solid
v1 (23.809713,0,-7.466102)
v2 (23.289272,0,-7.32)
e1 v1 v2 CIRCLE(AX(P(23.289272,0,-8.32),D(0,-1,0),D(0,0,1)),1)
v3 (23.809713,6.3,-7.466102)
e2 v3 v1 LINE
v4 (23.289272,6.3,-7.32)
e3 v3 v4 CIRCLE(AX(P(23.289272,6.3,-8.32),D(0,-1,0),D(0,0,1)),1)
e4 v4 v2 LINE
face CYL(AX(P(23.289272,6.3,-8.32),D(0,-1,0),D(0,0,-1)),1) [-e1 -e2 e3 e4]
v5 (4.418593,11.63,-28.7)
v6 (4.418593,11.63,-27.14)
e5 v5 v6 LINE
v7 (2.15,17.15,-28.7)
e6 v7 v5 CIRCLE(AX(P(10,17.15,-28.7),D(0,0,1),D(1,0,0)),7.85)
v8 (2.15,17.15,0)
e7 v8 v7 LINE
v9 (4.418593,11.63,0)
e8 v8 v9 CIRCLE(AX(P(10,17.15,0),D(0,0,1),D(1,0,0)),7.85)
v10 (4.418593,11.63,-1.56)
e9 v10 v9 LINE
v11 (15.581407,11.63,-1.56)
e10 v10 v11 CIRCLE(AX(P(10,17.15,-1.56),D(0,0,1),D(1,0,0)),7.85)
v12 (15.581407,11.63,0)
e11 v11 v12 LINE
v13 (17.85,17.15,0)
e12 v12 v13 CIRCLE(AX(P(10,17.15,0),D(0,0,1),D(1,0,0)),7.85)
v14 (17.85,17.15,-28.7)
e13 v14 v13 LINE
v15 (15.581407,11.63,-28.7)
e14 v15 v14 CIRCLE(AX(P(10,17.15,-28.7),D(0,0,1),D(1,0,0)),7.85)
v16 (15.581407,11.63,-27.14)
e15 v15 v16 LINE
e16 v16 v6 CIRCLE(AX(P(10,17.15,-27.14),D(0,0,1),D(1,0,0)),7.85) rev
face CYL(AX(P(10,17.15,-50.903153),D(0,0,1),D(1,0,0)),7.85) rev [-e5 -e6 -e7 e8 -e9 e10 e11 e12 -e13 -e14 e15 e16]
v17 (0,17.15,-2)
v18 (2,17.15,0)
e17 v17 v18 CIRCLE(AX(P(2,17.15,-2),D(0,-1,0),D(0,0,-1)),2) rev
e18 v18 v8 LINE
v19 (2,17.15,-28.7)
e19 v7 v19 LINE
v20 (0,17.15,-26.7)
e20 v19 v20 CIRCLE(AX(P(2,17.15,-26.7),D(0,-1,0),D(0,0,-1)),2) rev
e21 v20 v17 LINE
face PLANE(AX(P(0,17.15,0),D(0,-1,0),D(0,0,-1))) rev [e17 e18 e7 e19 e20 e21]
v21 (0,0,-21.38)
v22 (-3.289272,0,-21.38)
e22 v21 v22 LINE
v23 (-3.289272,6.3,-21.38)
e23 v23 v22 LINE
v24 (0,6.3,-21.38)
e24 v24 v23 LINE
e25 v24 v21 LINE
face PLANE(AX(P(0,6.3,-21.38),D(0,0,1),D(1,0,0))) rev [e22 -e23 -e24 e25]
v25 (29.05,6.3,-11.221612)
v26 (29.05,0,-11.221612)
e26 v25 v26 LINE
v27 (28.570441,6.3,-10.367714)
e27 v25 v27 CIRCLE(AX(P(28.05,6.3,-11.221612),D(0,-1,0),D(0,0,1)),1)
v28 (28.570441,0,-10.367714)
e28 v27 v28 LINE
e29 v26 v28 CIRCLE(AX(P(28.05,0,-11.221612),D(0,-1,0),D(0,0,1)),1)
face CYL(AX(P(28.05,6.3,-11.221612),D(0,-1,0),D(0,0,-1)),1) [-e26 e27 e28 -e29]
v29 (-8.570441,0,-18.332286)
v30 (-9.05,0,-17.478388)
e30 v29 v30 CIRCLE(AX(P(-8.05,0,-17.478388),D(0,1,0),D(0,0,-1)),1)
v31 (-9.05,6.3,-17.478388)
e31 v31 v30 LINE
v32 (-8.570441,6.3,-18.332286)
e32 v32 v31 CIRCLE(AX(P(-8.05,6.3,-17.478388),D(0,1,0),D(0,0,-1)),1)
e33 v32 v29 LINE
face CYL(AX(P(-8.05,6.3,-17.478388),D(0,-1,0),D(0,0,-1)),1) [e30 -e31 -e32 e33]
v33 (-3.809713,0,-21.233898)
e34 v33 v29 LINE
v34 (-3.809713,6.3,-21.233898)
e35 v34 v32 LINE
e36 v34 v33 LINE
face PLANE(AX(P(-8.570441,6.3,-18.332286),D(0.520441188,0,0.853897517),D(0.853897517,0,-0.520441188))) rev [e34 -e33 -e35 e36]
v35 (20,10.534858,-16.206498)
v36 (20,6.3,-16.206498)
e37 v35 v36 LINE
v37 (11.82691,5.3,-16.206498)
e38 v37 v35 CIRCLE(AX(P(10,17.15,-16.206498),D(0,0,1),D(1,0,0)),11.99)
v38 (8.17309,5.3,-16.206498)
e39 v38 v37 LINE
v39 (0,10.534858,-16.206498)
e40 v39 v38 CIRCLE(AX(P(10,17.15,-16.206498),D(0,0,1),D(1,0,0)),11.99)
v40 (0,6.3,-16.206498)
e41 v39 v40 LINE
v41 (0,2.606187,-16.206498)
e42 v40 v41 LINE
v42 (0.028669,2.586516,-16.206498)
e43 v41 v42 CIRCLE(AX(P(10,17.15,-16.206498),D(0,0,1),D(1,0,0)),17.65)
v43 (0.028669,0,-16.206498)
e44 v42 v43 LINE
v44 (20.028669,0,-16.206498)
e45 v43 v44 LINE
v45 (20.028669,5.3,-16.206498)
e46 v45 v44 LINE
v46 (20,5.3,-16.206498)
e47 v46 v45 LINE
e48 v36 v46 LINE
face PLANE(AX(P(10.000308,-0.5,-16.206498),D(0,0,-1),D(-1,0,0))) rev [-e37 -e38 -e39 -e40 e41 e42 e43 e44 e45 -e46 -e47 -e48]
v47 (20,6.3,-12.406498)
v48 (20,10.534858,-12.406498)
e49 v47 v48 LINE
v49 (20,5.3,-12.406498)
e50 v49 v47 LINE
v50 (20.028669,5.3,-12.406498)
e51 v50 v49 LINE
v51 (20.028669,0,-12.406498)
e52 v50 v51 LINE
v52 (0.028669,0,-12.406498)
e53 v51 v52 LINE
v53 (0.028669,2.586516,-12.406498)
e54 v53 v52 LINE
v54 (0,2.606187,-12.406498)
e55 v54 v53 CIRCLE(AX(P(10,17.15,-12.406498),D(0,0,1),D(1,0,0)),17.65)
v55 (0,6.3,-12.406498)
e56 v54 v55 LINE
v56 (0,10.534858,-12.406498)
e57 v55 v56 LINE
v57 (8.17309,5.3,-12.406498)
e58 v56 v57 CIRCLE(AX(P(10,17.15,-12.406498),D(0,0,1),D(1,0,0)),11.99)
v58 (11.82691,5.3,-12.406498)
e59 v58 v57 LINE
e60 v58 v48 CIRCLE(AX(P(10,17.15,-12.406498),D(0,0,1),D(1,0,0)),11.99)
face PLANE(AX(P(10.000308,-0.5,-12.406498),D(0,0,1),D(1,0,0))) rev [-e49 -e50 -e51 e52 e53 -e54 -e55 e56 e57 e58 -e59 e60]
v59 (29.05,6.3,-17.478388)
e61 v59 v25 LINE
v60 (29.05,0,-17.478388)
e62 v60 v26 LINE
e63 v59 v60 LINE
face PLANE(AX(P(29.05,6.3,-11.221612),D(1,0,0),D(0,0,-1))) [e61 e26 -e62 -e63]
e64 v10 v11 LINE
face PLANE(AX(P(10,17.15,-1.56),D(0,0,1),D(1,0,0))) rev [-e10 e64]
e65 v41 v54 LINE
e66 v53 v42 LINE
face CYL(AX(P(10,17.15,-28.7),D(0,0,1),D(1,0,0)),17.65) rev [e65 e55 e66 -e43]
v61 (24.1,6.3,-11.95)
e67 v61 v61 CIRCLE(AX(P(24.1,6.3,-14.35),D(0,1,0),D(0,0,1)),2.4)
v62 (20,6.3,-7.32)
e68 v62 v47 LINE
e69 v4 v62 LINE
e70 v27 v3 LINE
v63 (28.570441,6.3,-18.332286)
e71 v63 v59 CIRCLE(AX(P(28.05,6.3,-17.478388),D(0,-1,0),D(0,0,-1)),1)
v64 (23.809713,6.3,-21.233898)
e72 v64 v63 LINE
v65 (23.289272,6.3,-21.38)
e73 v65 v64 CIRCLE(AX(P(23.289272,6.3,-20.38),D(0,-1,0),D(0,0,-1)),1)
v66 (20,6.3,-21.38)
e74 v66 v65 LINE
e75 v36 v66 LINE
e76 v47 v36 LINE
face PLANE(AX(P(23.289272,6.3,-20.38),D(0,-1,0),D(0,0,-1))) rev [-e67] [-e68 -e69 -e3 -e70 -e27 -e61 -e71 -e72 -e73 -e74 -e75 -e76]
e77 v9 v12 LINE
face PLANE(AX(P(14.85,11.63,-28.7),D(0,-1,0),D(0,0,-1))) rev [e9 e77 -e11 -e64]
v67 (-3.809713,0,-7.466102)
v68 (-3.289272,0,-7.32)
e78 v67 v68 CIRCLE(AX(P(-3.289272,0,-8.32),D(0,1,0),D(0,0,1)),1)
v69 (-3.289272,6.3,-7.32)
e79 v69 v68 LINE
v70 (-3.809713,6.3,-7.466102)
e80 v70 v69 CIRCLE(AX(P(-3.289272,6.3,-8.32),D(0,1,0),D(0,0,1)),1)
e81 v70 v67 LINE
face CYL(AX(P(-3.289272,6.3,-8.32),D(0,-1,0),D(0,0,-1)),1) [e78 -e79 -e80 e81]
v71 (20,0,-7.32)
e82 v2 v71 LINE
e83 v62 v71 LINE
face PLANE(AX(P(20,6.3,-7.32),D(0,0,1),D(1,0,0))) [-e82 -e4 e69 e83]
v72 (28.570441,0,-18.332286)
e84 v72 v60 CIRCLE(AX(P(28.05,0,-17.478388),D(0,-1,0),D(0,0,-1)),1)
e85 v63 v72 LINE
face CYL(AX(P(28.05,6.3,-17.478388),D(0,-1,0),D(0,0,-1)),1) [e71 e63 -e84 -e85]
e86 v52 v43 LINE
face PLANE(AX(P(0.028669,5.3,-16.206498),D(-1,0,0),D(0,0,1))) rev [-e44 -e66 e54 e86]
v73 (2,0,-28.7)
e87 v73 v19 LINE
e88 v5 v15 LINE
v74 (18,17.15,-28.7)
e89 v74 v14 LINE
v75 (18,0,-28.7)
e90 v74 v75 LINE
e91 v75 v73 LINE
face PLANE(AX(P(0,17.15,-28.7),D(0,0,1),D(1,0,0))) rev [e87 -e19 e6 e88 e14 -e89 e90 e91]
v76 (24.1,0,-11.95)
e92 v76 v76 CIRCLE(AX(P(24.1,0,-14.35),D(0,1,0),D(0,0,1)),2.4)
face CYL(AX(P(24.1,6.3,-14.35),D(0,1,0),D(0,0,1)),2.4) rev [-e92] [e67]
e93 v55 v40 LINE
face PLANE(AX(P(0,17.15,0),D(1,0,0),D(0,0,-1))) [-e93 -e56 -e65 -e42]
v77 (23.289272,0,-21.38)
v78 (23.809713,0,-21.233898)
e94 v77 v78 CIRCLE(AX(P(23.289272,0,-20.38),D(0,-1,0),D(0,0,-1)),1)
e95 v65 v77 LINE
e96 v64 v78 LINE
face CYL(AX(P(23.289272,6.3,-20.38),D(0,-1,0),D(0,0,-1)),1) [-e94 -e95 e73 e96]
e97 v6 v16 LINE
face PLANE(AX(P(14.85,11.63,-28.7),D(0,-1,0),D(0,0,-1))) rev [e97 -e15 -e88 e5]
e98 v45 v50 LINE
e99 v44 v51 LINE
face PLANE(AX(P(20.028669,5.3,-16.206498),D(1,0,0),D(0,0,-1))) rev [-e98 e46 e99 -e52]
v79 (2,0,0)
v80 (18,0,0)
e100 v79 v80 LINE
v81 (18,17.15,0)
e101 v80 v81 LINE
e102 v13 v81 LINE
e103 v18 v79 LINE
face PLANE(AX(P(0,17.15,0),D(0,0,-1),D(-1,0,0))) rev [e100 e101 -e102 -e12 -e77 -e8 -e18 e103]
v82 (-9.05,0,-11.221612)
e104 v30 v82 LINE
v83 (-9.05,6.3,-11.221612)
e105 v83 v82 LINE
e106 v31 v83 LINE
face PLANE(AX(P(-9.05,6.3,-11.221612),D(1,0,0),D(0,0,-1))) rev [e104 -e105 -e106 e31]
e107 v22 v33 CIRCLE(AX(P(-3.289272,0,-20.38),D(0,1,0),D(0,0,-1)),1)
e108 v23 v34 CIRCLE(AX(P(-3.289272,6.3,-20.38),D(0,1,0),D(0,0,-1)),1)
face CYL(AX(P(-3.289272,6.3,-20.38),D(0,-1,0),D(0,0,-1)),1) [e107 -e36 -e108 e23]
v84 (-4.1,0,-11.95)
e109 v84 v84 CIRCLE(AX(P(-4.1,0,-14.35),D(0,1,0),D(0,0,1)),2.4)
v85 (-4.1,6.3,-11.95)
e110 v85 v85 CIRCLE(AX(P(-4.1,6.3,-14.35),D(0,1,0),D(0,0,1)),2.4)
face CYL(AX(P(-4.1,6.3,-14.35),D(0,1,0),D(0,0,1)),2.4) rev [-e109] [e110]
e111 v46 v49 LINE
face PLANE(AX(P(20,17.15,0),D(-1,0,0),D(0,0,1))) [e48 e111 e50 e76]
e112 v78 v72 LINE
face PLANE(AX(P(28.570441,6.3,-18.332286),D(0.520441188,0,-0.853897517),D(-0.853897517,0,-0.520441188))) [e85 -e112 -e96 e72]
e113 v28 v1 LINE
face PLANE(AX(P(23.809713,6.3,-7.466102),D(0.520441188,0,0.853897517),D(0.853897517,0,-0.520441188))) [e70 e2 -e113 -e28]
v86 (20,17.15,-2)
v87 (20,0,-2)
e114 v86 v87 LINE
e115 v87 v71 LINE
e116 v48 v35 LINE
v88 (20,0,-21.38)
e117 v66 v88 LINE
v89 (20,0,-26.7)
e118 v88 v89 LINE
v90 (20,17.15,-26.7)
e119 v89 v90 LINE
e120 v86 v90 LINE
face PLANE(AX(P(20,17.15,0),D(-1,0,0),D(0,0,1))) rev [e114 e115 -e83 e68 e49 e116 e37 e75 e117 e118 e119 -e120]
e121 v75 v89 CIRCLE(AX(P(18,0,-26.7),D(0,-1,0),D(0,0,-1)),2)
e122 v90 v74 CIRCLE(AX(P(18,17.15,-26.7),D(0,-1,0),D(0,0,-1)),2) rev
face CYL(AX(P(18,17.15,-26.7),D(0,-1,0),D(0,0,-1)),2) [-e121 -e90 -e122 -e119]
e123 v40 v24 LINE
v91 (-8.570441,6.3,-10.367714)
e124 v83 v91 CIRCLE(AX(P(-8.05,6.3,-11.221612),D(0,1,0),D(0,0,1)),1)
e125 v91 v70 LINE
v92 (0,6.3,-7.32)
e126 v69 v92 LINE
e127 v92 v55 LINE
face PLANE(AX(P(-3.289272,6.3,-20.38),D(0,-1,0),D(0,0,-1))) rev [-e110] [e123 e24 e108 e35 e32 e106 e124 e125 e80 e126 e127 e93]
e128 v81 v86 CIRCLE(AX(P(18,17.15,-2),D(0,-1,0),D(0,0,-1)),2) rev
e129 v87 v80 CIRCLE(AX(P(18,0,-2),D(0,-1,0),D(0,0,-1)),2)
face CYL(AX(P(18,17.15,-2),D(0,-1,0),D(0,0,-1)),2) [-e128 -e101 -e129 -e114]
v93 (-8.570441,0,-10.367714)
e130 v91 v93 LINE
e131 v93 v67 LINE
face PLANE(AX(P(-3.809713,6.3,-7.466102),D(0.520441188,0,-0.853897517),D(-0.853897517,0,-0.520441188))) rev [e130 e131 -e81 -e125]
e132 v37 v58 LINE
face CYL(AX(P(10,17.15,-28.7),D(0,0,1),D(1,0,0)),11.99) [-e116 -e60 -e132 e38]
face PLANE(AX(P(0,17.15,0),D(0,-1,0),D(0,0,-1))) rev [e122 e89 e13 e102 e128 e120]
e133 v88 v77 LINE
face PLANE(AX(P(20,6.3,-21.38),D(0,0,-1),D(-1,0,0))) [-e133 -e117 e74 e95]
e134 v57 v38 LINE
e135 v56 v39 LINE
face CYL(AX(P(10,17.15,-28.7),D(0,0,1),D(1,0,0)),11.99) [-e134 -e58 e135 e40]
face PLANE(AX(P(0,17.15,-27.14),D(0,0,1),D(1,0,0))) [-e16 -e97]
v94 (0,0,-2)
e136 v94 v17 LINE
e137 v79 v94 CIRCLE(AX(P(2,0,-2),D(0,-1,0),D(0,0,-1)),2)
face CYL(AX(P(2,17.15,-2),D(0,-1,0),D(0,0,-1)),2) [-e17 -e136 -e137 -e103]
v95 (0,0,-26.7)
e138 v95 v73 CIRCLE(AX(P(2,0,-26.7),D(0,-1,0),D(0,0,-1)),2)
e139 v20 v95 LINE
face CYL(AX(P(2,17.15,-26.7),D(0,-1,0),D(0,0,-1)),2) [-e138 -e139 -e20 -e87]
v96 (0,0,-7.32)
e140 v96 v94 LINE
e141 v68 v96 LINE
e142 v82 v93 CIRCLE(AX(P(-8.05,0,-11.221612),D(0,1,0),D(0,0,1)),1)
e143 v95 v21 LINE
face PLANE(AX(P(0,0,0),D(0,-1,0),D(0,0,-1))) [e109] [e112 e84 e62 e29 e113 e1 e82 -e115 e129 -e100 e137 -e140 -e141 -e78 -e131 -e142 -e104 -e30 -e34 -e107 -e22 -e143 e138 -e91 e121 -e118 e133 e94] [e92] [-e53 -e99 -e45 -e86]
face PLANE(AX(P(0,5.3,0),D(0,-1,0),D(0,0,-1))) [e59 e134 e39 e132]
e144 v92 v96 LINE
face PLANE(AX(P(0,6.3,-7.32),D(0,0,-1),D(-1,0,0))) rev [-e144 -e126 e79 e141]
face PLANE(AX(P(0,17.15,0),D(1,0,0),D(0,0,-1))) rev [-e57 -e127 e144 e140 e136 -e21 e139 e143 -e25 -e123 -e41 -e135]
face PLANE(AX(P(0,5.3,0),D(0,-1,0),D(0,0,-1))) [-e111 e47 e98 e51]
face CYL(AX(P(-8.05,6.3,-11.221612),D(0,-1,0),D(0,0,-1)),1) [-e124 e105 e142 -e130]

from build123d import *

# Parameters (mm, degrees)
SKETCH1_W            = 20
SKETCH1_H            = 28.7
BOSS_EXTRUDE1_DEPTH  = 17.15
CUT_EXTRUDE1_START   = -1.56
SKETCH2_R            = 7.85
CUT_EXTRUDE1_DEPTH   = 25.58
CUT_EXTRUDE2_DEPTH   = 39.959113
BOSS_EXTRUDE2_DEPTH  = 6.3
M4_CLEARANCE_HOLE1_D = 4.8
CUT_REVOLVE3_START   = -16.206498
CUT_REVOLVE3_DEPTH   = 3.8
CUT_REVOLVE4_START   = -16.206498
CUT_REVOLVE4_DEPTH   = 3.8
SKETCH10_W           = 20
SKETCH10_H           = 3.8
CUT_EXTRUDE3_DEPTH   = 5.3
FILLET1_R            = 2


# Read off the part's stored shape, not the designer's step: Cut-Revolve3, Cut-Revolve4
with BuildPart() as part:
    # Sketch1 → Boss-Extrude1 (new body)
    with BuildSketch(Plane(origin=(0, 0, 0), x_dir=(1, 0, 0), z_dir=(0, 1, 0))):
        with Locations((10, 14.35)):
            Rectangle(SKETCH1_W, SKETCH1_H)
    extrude(amount=BOSS_EXTRUDE1_DEPTH)

    # Sketch2 → Cut-Extrude1 (cut)
    with BuildSketch(Plane.XY.offset(CUT_EXTRUDE1_START)):
        with Locations((10, 17.15)):
            Circle(SKETCH2_R)
    extrude(amount=-CUT_EXTRUDE1_DEPTH, mode=Mode.SUBTRACT)

    # Sketch3 → Cut-Extrude2 (cut, through all)
    with BuildSketch(Plane.XY):
        with BuildLine():
            Line((2.15, 17.15), (17.85, 17.15))
            ThreePointArc((17.85, 17.15), (17.260735, 14.166005), (15.581407, 11.63))
            Line((15.581407, 11.63), (14.85, 11.63))
            Line((14.85, 11.63), (5.15, 11.63))
            Line((5.15, 11.63), (4.418593, 11.63))
            ThreePointArc((4.418593, 11.63), (2.739265, 14.166005), (2.15, 17.15))
        make_face()
    extrude(amount=-CUT_EXTRUDE2_DEPTH, mode=Mode.SUBTRACT)

    # Sketch4 → Boss-Extrude2 (add)
    with BuildSketch(Plane.XZ):
        with BuildLine():
            Line((20, -7.32), (23.289272, -7.32))
            ThreePointArc((23.289272, -7.32), (23.559552, -7.357218), (23.809713, -7.466102))
            Line((23.809713, -7.466102), (28.570441, -10.367714))
            ThreePointArc((28.570441, -10.367714), (28.921906, -10.731939), (29.05, -11.221612))
            Line((29.05, -11.221612), (29.05, -17.478388))
            ThreePointArc((29.05, -17.478388), (28.921906, -17.968061), (28.570441, -18.332286))
            Line((28.570441, -18.332286), (23.809713, -21.233898))
            ThreePointArc((23.809713, -21.233898), (23.559552, -21.342782), (23.289272, -21.38))
            Line((23.289272, -21.38), (20, -21.38))
            Line((20, -21.38), (20, -7.32))
        make_face()
    boss_extrude2 = extrude(amount=-BOSS_EXTRUDE2_DEPTH)

    # Mirror1: Boss-Extrude2 across plane
    add(boss_extrude2.mirror(Plane(origin=(10, 0, 0), x_dir=(0, 0, 1), z_dir=(1, 0, 0))))

    # M4 Clearance Hole1 (through all)
    with Locations(Plane(origin=(0, 6.3, 0), x_dir=(1, 0, 0), z_dir=(0, 1, 0))):
        with Locations((24.1, 14.35), (-4.1, 14.35)):
            Hole(M4_CLEARANCE_HOLE1_D / 2)

    # Cut-Revolve3 outline → Cut-Revolve3 (cut)
    with BuildSketch(Plane.XY.offset(CUT_REVOLVE3_START)):
        with BuildLine():
            Line((0, 10.534858), (0, 2.606187))
            ThreePointArc((0, 2.606187), (2.795508, 1.037341), (5.828669, 0))
            Line((5.828669, 0), (10, 0))
            Line((10, 0), (10, 5.16))
            ThreePointArc((10, 5.16), (4.323533, 6.588853), (0, 10.534858))
        make_face()
    extrude(amount=CUT_REVOLVE3_DEPTH, mode=Mode.SUBTRACT)

    # Cut-Revolve4 outline → Cut-Revolve4 (cut)
    with BuildSketch(Plane.XY.offset(CUT_REVOLVE4_START)):
        with BuildLine():
            ThreePointArc((20, 10.534858), (15.676467, 6.588853), (10, 5.16))
            Line((10, 5.16), (10, 0))
            Line((10, 0), (14.171331, 0))
            ThreePointArc((14.171331, 0), (17.204492, 1.037341), (20, 2.606187))
            Line((20, 2.606187), (20, 10.534858))
        make_face()
    extrude(amount=CUT_REVOLVE4_DEPTH, mode=Mode.SUBTRACT)

    # Sketch10 → Cut-Extrude3 (cut)
    with BuildSketch(Plane.XZ):
        with Locations((10.028669, -14.306498)):
            Rectangle(SKETCH10_W, SKETCH10_H)
    extrude(amount=-CUT_EXTRUDE3_DEPTH, mode=Mode.SUBTRACT)

    # Fillet1
    fillet1_edges = [part.edges().sort_by_distance(p)[0] for p in [
        (0, 8.575, -28.7),
        (20, 8.575, -28.7),
        (20, 8.575, 0),
        (0, 8.575, 0),
    ]]
    fillet(fillet1_edges, radius=FILLET1_R)


solid = part.part
